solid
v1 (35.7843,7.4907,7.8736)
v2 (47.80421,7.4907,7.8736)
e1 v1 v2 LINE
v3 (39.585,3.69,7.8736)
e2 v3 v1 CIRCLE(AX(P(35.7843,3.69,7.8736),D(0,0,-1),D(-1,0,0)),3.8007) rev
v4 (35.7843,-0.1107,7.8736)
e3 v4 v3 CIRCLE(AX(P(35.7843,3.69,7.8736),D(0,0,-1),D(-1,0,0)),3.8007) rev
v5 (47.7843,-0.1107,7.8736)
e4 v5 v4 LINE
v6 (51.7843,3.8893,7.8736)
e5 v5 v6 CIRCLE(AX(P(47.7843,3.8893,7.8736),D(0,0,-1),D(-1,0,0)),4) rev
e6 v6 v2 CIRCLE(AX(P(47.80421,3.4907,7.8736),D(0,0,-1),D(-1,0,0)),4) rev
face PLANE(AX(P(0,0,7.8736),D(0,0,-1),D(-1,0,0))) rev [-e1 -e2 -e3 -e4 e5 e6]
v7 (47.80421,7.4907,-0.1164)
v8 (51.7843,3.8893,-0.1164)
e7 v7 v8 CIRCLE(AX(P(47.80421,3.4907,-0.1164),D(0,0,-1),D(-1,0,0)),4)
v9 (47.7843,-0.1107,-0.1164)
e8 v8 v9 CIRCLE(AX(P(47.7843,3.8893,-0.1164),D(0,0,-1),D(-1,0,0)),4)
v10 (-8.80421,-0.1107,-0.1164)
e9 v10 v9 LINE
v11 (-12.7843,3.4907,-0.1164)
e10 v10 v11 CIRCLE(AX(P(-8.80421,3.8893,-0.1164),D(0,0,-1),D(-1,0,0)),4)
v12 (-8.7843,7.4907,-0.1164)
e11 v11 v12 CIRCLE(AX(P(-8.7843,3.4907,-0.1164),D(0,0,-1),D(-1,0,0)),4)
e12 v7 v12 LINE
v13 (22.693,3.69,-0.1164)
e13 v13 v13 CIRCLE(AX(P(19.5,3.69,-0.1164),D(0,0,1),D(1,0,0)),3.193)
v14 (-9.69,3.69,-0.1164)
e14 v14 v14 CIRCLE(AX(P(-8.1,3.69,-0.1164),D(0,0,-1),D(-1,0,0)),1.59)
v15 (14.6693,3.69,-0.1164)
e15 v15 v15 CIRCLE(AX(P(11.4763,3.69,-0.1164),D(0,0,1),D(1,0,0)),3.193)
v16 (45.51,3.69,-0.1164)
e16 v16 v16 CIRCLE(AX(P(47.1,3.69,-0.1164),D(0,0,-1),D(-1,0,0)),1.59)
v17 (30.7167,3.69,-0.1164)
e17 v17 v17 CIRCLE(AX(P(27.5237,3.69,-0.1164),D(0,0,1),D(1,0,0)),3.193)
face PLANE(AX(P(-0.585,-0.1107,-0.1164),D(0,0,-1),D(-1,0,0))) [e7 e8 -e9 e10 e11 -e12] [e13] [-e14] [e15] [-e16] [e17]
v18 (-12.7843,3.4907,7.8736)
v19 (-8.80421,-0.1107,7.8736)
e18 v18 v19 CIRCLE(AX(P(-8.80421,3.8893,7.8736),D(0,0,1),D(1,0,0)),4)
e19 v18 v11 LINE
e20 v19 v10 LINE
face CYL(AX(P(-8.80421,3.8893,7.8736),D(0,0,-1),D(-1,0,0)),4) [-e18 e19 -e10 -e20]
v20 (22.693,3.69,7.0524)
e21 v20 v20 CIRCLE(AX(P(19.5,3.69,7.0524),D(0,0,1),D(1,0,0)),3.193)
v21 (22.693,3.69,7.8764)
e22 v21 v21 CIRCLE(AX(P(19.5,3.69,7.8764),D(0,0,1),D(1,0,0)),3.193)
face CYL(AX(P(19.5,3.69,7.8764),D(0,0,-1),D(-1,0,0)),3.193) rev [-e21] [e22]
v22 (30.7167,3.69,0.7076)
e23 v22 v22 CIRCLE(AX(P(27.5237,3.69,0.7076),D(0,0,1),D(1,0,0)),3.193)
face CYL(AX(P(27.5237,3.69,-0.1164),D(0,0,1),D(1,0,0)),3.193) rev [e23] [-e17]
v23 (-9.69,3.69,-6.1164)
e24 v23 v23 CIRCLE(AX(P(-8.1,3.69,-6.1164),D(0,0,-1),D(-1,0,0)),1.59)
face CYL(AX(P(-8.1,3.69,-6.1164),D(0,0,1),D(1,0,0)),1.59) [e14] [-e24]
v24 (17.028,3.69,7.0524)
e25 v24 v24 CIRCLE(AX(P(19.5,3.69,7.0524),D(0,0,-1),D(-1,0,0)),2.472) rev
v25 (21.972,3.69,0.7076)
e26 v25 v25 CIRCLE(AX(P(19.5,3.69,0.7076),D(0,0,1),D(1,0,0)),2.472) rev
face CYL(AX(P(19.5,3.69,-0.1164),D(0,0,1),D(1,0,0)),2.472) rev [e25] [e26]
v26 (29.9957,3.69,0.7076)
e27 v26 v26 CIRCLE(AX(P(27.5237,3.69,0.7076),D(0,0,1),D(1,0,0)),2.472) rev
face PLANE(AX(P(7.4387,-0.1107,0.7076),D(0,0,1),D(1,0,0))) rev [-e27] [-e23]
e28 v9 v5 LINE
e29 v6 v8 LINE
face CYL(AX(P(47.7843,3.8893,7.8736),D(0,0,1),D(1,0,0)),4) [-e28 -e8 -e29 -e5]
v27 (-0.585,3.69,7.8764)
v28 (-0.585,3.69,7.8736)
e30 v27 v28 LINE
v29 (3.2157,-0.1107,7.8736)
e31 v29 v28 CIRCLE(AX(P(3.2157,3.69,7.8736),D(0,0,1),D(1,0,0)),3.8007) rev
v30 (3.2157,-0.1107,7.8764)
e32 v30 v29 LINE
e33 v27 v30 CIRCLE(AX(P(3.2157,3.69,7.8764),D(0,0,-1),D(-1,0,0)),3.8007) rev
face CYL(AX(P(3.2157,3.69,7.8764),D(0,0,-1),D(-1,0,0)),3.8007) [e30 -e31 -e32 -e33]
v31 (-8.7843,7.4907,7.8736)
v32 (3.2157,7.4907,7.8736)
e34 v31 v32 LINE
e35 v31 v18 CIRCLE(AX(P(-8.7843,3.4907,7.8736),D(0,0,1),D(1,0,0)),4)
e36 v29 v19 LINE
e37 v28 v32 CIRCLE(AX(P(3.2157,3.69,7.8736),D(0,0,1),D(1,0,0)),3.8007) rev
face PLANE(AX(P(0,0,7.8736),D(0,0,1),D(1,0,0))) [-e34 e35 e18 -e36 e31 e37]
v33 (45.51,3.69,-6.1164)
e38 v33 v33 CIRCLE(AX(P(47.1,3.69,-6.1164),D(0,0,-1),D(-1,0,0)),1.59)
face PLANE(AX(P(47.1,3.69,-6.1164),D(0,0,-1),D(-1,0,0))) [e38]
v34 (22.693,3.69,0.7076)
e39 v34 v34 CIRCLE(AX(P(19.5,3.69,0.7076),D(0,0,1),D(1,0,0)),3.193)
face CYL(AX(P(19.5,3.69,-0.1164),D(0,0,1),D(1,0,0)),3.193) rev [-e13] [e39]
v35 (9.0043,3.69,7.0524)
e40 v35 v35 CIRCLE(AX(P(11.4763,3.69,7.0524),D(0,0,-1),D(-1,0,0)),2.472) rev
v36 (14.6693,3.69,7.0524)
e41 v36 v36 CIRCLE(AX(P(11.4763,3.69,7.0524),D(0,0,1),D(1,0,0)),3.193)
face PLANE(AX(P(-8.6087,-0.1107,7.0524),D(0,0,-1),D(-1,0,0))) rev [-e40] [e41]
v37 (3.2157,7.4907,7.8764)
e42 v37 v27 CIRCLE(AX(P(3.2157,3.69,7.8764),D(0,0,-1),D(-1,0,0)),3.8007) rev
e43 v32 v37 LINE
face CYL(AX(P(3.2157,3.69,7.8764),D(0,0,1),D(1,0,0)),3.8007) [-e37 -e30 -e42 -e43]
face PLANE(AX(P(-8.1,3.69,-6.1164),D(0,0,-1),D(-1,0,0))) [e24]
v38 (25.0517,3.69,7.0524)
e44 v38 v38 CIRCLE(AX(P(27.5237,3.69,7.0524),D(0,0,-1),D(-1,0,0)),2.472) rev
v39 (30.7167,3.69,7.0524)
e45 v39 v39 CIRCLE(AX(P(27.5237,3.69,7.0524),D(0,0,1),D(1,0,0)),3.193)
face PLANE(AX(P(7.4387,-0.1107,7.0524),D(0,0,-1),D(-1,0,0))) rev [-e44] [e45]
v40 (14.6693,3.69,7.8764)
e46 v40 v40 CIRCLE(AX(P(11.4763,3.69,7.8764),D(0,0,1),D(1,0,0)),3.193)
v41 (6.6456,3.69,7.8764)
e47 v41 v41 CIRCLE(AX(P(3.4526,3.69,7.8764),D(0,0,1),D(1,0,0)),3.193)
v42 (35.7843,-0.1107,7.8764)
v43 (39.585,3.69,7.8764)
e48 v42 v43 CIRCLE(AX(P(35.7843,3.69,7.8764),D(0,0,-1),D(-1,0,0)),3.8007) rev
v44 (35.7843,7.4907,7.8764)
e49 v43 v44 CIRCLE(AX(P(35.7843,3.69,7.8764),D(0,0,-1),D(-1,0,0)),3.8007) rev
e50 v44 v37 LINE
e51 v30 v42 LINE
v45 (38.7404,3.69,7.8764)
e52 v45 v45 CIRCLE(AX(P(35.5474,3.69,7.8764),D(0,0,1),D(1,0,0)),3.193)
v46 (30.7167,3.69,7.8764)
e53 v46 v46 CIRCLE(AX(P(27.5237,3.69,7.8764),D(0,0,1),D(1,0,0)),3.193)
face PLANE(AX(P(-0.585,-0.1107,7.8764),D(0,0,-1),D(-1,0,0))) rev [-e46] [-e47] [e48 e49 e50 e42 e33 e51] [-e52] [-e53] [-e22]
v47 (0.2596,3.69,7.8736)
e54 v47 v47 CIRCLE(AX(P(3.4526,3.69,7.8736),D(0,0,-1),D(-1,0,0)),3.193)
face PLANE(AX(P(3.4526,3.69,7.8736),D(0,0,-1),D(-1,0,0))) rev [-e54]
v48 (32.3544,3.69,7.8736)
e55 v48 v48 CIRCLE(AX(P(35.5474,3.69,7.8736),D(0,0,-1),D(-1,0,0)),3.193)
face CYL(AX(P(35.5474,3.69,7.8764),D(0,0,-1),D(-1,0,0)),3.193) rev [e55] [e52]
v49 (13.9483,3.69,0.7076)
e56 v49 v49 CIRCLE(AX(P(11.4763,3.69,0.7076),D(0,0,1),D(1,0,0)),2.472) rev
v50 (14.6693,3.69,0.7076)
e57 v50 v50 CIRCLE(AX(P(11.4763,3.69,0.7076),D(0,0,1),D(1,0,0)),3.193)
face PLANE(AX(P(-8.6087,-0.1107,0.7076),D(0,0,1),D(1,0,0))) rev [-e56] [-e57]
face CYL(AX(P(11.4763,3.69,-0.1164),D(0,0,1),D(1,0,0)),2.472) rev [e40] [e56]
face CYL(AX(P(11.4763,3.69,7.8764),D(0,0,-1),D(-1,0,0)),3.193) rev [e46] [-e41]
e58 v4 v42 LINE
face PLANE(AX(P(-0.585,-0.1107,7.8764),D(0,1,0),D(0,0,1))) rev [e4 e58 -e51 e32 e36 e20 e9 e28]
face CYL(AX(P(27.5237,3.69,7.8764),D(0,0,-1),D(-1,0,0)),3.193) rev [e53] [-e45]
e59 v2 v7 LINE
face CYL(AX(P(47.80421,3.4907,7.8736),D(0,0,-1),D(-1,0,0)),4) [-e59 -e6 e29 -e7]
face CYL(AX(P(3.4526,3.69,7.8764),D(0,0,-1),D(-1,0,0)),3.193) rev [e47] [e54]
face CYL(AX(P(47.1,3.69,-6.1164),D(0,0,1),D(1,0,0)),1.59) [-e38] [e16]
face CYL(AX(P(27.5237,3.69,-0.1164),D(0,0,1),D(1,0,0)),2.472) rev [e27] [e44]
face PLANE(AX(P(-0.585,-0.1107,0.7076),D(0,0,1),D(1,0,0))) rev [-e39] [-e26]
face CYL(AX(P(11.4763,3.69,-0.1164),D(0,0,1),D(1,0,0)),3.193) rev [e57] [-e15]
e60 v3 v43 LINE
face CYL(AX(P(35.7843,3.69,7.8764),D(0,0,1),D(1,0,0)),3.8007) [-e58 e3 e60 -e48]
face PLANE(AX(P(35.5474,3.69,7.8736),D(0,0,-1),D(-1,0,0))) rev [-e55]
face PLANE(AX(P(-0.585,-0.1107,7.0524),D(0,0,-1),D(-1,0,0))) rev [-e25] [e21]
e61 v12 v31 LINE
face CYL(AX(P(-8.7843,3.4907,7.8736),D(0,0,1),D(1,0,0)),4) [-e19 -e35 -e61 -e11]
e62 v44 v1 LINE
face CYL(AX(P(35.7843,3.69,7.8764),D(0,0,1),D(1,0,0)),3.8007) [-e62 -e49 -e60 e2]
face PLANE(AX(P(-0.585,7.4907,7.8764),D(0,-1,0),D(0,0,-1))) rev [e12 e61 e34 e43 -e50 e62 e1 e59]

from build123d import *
from build123d.topology import SkipClean

# Parameters (mm, degrees)
SKETCH1_W                = 39
SKETCH1_H                = 7.38
BOSS_EXTRUDE1_DEPTH      = 7.76
SKETCH2_R                = 2.4
CUT_EXTRUDE1_DEPTH       = 7.76
CUT_EXTRUDE2_OUTLINE_R   = 3.1
CUT_EXTRUDE2_OUTLINE_R_2 = 2.4
CUT_EXTRUDE2_DEPTH       = 0.8
CUT_EXTRUDE3_START       = 6.96
CUT_EXTRUDE3_OUTLINE_R   = 3.1
CUT_EXTRUDE3_OUTLINE_R_2 = 2.4
CUT_EXTRUDE3_DEPTH       = 0.8
LPATTERN3_COUNT          = 3
LPATTERN3_PITCH          = 7.79
LPATTERN6_COUNT          = 3
LPATTERN6_PITCH          = 7.79
FILLET1_R                = 3.69
FILLET2_R                = 3.69
FILLET3_R                = 3.69
FILLET4_R                = 3.69
SCALE1_SCALE             = 1.03
SKETCH5_R                = 3.193
BOSS_EXTRUDE2_DEPTH      = 7.99
SKETCH7_W                = 16
SKETCH7_H                = 7.6014
BOSS_EXTRUDE4_DEPTH      = 7.99
SKETCH4_R                = 1.59
BOSS_EXTRUDE5_DEPTH      = 6
FILLET5_R                = 4
FILLET6_R                = 4
FILLET7_R                = 4
FILLET8_R                = 4


with BuildPart() as part:
    # Sketch1 → Boss-Extrude1 (new body)
    with BuildSketch(Plane.XY):
        with Locations((19.5, 3.69)):
            Rectangle(SKETCH1_W, SKETCH1_H)
    extrude(amount=BOSS_EXTRUDE1_DEPTH)

    # Sketch2 → Cut-Extrude1 (cut)
    with BuildSketch(Plane.XY.offset(7.76)):
        with Locations((19.5, 3.69)):
            Circle(SKETCH2_R)
    cut_extrude1 = extrude(amount=-CUT_EXTRUDE1_DEPTH, mode=Mode.SUBTRACT)

    # Cut-Extrude2: read off the stored shape, not the designer's step
    # Cut-Extrude2 outline → Cut-Extrude2 (cut)
    with BuildSketch(Plane.XY):
        with Locations((19.5, 3.69)):
            Circle(CUT_EXTRUDE2_OUTLINE_R)
        with Locations((19.5, 3.69)):
            Circle(CUT_EXTRUDE2_OUTLINE_R_2, mode=Mode.SUBTRACT)
    cut_extrude2 = extrude(amount=CUT_EXTRUDE2_DEPTH, mode=Mode.SUBTRACT)

    # Cut-Extrude3: read off the stored shape, not the designer's step
    # Cut-Extrude3 outline → Cut-Extrude3 (cut)
    with BuildSketch(Plane.XY.offset(CUT_EXTRUDE3_START)):
        with Locations((19.5, 3.69)):
            Circle(CUT_EXTRUDE3_OUTLINE_R)
        with Locations((19.5, 3.69)):
            Circle(CUT_EXTRUDE3_OUTLINE_R_2, mode=Mode.SUBTRACT)
    cut_extrude3 = extrude(amount=CUT_EXTRUDE3_DEPTH, mode=Mode.SUBTRACT)

    # LPattern3: Cut-Extrude1, Cut-Extrude2, Cut-Extrude3 ×3
    with Locations(*[(-i * LPATTERN3_PITCH, 0, 0) for i in range(1, LPATTERN3_COUNT)]):
        add(cut_extrude1, mode=Mode.SUBTRACT)
        add(cut_extrude2, mode=Mode.SUBTRACT)
        add(cut_extrude3, mode=Mode.SUBTRACT)

    # LPattern6: Cut-Extrude1, Cut-Extrude2, Cut-Extrude3 ×3
    with Locations(*[(i * LPATTERN6_PITCH, 0, 0) for i in range(1, LPATTERN6_COUNT)]):
        add(cut_extrude1, mode=Mode.SUBTRACT)
        add(cut_extrude2, mode=Mode.SUBTRACT)
        add(cut_extrude3, mode=Mode.SUBTRACT)

    # Fillet1
    fillet1_edges = [part.edges().sort_by_distance(p)[0] for p in [
        (0, 7.38, 3.88),
    ]]
    fillet(fillet1_edges, radius=FILLET1_R)

    # Fillet2
    fillet2_edges = [part.edges().sort_by_distance(p)[0] for p in [
        (0, 0, 3.88),
    ]]
    fillet(fillet2_edges, radius=FILLET2_R - 0.0001)  # a hair under: the kernel refuses the full size

    # Fillet3
    fillet3_edges = [part.edges().sort_by_distance(p)[0] for p in [
        (39, 7.38, 3.88),
    ]]
    fillet(fillet3_edges, radius=FILLET3_R)

    # Fillet4
    fillet4_edges = [part.edges().sort_by_distance(p)[0] for p in [
        (39, 0, 3.88),
    ]]
    fillet(fillet4_edges, radius=FILLET4_R - 0.0001)  # a hair under: the kernel refuses the full size


with BuildPart() as part_1:
    # Scale1: scaled about (19.5, 3.689995512, 3.88)
    add(part.part.scale(SCALE1_SCALE).moved(Location((-0.585, -0.110699865, -0.1164))))

    # Sketch5 → Boss-Extrude2 (add)
    with BuildSketch(Plane(origin=(0, 0, -0.1164), x_dir=(-1, 0, 0), z_dir=(0, 0, -1))):
        with Locations((-35.5474, 3.69)):
            Circle(SKETCH5_R)
        with Locations((-3.4526, 3.69)):
            Circle(SKETCH5_R)
    extrude(amount=-BOSS_EXTRUDE2_DEPTH)

    # Sketch7 → Boss-Extrude4 (add)
    with SkipClean():  # the faces are left unmerged after this step: merging them gives an invalid solid
        with BuildSketch(Plane(origin=(0, 0, -0.1164), x_dir=(-1, 0, 0), z_dir=(0, 0, -1))):
            with Locations((-43.7843, 3.69)):
                Rectangle(SKETCH7_W, SKETCH7_H)
            with Locations((4.7843, 3.69)):
                Rectangle(SKETCH7_W, SKETCH7_H)
        extrude(amount=-BOSS_EXTRUDE4_DEPTH)

    # Sketch4 → Boss-Extrude5 (add)
    with SkipClean():  # the faces are left unmerged after this step: merging them gives an invalid solid
        with BuildSketch(Plane(origin=(0, 0, -0.1164), x_dir=(-1, 0, 0), z_dir=(0, 0, -1))):
            with Locations((-47.1, 3.69)):
                Circle(SKETCH4_R)
            with Locations((8.1, 3.69)):
                Circle(SKETCH4_R)
        extrude(amount=BOSS_EXTRUDE5_DEPTH)

    # Fillet5
    fillet5_edges = [part_1.edges().sort_by_distance(p)[0] for p in [
        (51.7843, -0.1107, 3.8786),
    ]]
    fillet(fillet5_edges, radius=FILLET5_R)

    # Fillet6
    # the kernel refuses this fillet: 4 mm, written as the material it takes off along each edge
    with BuildSketch(Plane(origin=(51.7843, 7.4907, -10.066625513), x_dir=(0, -1, 0), z_dir=(0, 0, 1))) as fillet6_piece_1:
        with BuildLine():
            CenterArc((4, -3.980090205), FILLET6_R, 95.719016284, 84.280983716)
            Line((0, -3.980090205), (-0.08, -3.980090205))
            Line((-0.08, -3.980090205), (-0.08, 0))
            Line((-0.08, 0), (0, 0.08))
            ThreePointArc((0, 0.08), (1.8007, 0.08), (3.593428, 0.079601804))
            Line((3.593428, 0.079601804), (3.6014, 0))
        make_face()
    extrude(amount=27.890451025, mode=Mode.SUBTRACT)

    # Fillet7
    fillet7_edges = [part_1.edges().sort_by_distance(p)[0] for p in [
        (-12.7843, 7.4907, 3.8786),
    ]]
    fillet(fillet7_edges, radius=FILLET7_R)

    # Fillet8
    # the kernel refuses this fillet: 4 mm, written as the material it takes off along each edge
    with BuildSketch(Plane(origin=(-12.7843, -0.1107, -10.066625513), x_dir=(0, 1, 0), z_dir=(0, 0, 1))) as fillet8_piece_1:
        with BuildLine():
            CenterArc((4, -3.980090205), FILLET8_R, 95.719016284, 84.280983716)
            Line((0, -3.980090205), (-0.08, -3.980090205))
            Line((-0.08, -3.980090205), (-0.08, 0))
            Line((-0.08, 0), (0, 0.08))
            ThreePointArc((0, 0.08), (1.8007, 0.08), (3.593428, 0.079601804))
            Line((3.593428, 0.079601804), (3.6014, 0))
        make_face()
    extrude(amount=27.890451025, mode=Mode.SUBTRACT)


solid = part_1.part
